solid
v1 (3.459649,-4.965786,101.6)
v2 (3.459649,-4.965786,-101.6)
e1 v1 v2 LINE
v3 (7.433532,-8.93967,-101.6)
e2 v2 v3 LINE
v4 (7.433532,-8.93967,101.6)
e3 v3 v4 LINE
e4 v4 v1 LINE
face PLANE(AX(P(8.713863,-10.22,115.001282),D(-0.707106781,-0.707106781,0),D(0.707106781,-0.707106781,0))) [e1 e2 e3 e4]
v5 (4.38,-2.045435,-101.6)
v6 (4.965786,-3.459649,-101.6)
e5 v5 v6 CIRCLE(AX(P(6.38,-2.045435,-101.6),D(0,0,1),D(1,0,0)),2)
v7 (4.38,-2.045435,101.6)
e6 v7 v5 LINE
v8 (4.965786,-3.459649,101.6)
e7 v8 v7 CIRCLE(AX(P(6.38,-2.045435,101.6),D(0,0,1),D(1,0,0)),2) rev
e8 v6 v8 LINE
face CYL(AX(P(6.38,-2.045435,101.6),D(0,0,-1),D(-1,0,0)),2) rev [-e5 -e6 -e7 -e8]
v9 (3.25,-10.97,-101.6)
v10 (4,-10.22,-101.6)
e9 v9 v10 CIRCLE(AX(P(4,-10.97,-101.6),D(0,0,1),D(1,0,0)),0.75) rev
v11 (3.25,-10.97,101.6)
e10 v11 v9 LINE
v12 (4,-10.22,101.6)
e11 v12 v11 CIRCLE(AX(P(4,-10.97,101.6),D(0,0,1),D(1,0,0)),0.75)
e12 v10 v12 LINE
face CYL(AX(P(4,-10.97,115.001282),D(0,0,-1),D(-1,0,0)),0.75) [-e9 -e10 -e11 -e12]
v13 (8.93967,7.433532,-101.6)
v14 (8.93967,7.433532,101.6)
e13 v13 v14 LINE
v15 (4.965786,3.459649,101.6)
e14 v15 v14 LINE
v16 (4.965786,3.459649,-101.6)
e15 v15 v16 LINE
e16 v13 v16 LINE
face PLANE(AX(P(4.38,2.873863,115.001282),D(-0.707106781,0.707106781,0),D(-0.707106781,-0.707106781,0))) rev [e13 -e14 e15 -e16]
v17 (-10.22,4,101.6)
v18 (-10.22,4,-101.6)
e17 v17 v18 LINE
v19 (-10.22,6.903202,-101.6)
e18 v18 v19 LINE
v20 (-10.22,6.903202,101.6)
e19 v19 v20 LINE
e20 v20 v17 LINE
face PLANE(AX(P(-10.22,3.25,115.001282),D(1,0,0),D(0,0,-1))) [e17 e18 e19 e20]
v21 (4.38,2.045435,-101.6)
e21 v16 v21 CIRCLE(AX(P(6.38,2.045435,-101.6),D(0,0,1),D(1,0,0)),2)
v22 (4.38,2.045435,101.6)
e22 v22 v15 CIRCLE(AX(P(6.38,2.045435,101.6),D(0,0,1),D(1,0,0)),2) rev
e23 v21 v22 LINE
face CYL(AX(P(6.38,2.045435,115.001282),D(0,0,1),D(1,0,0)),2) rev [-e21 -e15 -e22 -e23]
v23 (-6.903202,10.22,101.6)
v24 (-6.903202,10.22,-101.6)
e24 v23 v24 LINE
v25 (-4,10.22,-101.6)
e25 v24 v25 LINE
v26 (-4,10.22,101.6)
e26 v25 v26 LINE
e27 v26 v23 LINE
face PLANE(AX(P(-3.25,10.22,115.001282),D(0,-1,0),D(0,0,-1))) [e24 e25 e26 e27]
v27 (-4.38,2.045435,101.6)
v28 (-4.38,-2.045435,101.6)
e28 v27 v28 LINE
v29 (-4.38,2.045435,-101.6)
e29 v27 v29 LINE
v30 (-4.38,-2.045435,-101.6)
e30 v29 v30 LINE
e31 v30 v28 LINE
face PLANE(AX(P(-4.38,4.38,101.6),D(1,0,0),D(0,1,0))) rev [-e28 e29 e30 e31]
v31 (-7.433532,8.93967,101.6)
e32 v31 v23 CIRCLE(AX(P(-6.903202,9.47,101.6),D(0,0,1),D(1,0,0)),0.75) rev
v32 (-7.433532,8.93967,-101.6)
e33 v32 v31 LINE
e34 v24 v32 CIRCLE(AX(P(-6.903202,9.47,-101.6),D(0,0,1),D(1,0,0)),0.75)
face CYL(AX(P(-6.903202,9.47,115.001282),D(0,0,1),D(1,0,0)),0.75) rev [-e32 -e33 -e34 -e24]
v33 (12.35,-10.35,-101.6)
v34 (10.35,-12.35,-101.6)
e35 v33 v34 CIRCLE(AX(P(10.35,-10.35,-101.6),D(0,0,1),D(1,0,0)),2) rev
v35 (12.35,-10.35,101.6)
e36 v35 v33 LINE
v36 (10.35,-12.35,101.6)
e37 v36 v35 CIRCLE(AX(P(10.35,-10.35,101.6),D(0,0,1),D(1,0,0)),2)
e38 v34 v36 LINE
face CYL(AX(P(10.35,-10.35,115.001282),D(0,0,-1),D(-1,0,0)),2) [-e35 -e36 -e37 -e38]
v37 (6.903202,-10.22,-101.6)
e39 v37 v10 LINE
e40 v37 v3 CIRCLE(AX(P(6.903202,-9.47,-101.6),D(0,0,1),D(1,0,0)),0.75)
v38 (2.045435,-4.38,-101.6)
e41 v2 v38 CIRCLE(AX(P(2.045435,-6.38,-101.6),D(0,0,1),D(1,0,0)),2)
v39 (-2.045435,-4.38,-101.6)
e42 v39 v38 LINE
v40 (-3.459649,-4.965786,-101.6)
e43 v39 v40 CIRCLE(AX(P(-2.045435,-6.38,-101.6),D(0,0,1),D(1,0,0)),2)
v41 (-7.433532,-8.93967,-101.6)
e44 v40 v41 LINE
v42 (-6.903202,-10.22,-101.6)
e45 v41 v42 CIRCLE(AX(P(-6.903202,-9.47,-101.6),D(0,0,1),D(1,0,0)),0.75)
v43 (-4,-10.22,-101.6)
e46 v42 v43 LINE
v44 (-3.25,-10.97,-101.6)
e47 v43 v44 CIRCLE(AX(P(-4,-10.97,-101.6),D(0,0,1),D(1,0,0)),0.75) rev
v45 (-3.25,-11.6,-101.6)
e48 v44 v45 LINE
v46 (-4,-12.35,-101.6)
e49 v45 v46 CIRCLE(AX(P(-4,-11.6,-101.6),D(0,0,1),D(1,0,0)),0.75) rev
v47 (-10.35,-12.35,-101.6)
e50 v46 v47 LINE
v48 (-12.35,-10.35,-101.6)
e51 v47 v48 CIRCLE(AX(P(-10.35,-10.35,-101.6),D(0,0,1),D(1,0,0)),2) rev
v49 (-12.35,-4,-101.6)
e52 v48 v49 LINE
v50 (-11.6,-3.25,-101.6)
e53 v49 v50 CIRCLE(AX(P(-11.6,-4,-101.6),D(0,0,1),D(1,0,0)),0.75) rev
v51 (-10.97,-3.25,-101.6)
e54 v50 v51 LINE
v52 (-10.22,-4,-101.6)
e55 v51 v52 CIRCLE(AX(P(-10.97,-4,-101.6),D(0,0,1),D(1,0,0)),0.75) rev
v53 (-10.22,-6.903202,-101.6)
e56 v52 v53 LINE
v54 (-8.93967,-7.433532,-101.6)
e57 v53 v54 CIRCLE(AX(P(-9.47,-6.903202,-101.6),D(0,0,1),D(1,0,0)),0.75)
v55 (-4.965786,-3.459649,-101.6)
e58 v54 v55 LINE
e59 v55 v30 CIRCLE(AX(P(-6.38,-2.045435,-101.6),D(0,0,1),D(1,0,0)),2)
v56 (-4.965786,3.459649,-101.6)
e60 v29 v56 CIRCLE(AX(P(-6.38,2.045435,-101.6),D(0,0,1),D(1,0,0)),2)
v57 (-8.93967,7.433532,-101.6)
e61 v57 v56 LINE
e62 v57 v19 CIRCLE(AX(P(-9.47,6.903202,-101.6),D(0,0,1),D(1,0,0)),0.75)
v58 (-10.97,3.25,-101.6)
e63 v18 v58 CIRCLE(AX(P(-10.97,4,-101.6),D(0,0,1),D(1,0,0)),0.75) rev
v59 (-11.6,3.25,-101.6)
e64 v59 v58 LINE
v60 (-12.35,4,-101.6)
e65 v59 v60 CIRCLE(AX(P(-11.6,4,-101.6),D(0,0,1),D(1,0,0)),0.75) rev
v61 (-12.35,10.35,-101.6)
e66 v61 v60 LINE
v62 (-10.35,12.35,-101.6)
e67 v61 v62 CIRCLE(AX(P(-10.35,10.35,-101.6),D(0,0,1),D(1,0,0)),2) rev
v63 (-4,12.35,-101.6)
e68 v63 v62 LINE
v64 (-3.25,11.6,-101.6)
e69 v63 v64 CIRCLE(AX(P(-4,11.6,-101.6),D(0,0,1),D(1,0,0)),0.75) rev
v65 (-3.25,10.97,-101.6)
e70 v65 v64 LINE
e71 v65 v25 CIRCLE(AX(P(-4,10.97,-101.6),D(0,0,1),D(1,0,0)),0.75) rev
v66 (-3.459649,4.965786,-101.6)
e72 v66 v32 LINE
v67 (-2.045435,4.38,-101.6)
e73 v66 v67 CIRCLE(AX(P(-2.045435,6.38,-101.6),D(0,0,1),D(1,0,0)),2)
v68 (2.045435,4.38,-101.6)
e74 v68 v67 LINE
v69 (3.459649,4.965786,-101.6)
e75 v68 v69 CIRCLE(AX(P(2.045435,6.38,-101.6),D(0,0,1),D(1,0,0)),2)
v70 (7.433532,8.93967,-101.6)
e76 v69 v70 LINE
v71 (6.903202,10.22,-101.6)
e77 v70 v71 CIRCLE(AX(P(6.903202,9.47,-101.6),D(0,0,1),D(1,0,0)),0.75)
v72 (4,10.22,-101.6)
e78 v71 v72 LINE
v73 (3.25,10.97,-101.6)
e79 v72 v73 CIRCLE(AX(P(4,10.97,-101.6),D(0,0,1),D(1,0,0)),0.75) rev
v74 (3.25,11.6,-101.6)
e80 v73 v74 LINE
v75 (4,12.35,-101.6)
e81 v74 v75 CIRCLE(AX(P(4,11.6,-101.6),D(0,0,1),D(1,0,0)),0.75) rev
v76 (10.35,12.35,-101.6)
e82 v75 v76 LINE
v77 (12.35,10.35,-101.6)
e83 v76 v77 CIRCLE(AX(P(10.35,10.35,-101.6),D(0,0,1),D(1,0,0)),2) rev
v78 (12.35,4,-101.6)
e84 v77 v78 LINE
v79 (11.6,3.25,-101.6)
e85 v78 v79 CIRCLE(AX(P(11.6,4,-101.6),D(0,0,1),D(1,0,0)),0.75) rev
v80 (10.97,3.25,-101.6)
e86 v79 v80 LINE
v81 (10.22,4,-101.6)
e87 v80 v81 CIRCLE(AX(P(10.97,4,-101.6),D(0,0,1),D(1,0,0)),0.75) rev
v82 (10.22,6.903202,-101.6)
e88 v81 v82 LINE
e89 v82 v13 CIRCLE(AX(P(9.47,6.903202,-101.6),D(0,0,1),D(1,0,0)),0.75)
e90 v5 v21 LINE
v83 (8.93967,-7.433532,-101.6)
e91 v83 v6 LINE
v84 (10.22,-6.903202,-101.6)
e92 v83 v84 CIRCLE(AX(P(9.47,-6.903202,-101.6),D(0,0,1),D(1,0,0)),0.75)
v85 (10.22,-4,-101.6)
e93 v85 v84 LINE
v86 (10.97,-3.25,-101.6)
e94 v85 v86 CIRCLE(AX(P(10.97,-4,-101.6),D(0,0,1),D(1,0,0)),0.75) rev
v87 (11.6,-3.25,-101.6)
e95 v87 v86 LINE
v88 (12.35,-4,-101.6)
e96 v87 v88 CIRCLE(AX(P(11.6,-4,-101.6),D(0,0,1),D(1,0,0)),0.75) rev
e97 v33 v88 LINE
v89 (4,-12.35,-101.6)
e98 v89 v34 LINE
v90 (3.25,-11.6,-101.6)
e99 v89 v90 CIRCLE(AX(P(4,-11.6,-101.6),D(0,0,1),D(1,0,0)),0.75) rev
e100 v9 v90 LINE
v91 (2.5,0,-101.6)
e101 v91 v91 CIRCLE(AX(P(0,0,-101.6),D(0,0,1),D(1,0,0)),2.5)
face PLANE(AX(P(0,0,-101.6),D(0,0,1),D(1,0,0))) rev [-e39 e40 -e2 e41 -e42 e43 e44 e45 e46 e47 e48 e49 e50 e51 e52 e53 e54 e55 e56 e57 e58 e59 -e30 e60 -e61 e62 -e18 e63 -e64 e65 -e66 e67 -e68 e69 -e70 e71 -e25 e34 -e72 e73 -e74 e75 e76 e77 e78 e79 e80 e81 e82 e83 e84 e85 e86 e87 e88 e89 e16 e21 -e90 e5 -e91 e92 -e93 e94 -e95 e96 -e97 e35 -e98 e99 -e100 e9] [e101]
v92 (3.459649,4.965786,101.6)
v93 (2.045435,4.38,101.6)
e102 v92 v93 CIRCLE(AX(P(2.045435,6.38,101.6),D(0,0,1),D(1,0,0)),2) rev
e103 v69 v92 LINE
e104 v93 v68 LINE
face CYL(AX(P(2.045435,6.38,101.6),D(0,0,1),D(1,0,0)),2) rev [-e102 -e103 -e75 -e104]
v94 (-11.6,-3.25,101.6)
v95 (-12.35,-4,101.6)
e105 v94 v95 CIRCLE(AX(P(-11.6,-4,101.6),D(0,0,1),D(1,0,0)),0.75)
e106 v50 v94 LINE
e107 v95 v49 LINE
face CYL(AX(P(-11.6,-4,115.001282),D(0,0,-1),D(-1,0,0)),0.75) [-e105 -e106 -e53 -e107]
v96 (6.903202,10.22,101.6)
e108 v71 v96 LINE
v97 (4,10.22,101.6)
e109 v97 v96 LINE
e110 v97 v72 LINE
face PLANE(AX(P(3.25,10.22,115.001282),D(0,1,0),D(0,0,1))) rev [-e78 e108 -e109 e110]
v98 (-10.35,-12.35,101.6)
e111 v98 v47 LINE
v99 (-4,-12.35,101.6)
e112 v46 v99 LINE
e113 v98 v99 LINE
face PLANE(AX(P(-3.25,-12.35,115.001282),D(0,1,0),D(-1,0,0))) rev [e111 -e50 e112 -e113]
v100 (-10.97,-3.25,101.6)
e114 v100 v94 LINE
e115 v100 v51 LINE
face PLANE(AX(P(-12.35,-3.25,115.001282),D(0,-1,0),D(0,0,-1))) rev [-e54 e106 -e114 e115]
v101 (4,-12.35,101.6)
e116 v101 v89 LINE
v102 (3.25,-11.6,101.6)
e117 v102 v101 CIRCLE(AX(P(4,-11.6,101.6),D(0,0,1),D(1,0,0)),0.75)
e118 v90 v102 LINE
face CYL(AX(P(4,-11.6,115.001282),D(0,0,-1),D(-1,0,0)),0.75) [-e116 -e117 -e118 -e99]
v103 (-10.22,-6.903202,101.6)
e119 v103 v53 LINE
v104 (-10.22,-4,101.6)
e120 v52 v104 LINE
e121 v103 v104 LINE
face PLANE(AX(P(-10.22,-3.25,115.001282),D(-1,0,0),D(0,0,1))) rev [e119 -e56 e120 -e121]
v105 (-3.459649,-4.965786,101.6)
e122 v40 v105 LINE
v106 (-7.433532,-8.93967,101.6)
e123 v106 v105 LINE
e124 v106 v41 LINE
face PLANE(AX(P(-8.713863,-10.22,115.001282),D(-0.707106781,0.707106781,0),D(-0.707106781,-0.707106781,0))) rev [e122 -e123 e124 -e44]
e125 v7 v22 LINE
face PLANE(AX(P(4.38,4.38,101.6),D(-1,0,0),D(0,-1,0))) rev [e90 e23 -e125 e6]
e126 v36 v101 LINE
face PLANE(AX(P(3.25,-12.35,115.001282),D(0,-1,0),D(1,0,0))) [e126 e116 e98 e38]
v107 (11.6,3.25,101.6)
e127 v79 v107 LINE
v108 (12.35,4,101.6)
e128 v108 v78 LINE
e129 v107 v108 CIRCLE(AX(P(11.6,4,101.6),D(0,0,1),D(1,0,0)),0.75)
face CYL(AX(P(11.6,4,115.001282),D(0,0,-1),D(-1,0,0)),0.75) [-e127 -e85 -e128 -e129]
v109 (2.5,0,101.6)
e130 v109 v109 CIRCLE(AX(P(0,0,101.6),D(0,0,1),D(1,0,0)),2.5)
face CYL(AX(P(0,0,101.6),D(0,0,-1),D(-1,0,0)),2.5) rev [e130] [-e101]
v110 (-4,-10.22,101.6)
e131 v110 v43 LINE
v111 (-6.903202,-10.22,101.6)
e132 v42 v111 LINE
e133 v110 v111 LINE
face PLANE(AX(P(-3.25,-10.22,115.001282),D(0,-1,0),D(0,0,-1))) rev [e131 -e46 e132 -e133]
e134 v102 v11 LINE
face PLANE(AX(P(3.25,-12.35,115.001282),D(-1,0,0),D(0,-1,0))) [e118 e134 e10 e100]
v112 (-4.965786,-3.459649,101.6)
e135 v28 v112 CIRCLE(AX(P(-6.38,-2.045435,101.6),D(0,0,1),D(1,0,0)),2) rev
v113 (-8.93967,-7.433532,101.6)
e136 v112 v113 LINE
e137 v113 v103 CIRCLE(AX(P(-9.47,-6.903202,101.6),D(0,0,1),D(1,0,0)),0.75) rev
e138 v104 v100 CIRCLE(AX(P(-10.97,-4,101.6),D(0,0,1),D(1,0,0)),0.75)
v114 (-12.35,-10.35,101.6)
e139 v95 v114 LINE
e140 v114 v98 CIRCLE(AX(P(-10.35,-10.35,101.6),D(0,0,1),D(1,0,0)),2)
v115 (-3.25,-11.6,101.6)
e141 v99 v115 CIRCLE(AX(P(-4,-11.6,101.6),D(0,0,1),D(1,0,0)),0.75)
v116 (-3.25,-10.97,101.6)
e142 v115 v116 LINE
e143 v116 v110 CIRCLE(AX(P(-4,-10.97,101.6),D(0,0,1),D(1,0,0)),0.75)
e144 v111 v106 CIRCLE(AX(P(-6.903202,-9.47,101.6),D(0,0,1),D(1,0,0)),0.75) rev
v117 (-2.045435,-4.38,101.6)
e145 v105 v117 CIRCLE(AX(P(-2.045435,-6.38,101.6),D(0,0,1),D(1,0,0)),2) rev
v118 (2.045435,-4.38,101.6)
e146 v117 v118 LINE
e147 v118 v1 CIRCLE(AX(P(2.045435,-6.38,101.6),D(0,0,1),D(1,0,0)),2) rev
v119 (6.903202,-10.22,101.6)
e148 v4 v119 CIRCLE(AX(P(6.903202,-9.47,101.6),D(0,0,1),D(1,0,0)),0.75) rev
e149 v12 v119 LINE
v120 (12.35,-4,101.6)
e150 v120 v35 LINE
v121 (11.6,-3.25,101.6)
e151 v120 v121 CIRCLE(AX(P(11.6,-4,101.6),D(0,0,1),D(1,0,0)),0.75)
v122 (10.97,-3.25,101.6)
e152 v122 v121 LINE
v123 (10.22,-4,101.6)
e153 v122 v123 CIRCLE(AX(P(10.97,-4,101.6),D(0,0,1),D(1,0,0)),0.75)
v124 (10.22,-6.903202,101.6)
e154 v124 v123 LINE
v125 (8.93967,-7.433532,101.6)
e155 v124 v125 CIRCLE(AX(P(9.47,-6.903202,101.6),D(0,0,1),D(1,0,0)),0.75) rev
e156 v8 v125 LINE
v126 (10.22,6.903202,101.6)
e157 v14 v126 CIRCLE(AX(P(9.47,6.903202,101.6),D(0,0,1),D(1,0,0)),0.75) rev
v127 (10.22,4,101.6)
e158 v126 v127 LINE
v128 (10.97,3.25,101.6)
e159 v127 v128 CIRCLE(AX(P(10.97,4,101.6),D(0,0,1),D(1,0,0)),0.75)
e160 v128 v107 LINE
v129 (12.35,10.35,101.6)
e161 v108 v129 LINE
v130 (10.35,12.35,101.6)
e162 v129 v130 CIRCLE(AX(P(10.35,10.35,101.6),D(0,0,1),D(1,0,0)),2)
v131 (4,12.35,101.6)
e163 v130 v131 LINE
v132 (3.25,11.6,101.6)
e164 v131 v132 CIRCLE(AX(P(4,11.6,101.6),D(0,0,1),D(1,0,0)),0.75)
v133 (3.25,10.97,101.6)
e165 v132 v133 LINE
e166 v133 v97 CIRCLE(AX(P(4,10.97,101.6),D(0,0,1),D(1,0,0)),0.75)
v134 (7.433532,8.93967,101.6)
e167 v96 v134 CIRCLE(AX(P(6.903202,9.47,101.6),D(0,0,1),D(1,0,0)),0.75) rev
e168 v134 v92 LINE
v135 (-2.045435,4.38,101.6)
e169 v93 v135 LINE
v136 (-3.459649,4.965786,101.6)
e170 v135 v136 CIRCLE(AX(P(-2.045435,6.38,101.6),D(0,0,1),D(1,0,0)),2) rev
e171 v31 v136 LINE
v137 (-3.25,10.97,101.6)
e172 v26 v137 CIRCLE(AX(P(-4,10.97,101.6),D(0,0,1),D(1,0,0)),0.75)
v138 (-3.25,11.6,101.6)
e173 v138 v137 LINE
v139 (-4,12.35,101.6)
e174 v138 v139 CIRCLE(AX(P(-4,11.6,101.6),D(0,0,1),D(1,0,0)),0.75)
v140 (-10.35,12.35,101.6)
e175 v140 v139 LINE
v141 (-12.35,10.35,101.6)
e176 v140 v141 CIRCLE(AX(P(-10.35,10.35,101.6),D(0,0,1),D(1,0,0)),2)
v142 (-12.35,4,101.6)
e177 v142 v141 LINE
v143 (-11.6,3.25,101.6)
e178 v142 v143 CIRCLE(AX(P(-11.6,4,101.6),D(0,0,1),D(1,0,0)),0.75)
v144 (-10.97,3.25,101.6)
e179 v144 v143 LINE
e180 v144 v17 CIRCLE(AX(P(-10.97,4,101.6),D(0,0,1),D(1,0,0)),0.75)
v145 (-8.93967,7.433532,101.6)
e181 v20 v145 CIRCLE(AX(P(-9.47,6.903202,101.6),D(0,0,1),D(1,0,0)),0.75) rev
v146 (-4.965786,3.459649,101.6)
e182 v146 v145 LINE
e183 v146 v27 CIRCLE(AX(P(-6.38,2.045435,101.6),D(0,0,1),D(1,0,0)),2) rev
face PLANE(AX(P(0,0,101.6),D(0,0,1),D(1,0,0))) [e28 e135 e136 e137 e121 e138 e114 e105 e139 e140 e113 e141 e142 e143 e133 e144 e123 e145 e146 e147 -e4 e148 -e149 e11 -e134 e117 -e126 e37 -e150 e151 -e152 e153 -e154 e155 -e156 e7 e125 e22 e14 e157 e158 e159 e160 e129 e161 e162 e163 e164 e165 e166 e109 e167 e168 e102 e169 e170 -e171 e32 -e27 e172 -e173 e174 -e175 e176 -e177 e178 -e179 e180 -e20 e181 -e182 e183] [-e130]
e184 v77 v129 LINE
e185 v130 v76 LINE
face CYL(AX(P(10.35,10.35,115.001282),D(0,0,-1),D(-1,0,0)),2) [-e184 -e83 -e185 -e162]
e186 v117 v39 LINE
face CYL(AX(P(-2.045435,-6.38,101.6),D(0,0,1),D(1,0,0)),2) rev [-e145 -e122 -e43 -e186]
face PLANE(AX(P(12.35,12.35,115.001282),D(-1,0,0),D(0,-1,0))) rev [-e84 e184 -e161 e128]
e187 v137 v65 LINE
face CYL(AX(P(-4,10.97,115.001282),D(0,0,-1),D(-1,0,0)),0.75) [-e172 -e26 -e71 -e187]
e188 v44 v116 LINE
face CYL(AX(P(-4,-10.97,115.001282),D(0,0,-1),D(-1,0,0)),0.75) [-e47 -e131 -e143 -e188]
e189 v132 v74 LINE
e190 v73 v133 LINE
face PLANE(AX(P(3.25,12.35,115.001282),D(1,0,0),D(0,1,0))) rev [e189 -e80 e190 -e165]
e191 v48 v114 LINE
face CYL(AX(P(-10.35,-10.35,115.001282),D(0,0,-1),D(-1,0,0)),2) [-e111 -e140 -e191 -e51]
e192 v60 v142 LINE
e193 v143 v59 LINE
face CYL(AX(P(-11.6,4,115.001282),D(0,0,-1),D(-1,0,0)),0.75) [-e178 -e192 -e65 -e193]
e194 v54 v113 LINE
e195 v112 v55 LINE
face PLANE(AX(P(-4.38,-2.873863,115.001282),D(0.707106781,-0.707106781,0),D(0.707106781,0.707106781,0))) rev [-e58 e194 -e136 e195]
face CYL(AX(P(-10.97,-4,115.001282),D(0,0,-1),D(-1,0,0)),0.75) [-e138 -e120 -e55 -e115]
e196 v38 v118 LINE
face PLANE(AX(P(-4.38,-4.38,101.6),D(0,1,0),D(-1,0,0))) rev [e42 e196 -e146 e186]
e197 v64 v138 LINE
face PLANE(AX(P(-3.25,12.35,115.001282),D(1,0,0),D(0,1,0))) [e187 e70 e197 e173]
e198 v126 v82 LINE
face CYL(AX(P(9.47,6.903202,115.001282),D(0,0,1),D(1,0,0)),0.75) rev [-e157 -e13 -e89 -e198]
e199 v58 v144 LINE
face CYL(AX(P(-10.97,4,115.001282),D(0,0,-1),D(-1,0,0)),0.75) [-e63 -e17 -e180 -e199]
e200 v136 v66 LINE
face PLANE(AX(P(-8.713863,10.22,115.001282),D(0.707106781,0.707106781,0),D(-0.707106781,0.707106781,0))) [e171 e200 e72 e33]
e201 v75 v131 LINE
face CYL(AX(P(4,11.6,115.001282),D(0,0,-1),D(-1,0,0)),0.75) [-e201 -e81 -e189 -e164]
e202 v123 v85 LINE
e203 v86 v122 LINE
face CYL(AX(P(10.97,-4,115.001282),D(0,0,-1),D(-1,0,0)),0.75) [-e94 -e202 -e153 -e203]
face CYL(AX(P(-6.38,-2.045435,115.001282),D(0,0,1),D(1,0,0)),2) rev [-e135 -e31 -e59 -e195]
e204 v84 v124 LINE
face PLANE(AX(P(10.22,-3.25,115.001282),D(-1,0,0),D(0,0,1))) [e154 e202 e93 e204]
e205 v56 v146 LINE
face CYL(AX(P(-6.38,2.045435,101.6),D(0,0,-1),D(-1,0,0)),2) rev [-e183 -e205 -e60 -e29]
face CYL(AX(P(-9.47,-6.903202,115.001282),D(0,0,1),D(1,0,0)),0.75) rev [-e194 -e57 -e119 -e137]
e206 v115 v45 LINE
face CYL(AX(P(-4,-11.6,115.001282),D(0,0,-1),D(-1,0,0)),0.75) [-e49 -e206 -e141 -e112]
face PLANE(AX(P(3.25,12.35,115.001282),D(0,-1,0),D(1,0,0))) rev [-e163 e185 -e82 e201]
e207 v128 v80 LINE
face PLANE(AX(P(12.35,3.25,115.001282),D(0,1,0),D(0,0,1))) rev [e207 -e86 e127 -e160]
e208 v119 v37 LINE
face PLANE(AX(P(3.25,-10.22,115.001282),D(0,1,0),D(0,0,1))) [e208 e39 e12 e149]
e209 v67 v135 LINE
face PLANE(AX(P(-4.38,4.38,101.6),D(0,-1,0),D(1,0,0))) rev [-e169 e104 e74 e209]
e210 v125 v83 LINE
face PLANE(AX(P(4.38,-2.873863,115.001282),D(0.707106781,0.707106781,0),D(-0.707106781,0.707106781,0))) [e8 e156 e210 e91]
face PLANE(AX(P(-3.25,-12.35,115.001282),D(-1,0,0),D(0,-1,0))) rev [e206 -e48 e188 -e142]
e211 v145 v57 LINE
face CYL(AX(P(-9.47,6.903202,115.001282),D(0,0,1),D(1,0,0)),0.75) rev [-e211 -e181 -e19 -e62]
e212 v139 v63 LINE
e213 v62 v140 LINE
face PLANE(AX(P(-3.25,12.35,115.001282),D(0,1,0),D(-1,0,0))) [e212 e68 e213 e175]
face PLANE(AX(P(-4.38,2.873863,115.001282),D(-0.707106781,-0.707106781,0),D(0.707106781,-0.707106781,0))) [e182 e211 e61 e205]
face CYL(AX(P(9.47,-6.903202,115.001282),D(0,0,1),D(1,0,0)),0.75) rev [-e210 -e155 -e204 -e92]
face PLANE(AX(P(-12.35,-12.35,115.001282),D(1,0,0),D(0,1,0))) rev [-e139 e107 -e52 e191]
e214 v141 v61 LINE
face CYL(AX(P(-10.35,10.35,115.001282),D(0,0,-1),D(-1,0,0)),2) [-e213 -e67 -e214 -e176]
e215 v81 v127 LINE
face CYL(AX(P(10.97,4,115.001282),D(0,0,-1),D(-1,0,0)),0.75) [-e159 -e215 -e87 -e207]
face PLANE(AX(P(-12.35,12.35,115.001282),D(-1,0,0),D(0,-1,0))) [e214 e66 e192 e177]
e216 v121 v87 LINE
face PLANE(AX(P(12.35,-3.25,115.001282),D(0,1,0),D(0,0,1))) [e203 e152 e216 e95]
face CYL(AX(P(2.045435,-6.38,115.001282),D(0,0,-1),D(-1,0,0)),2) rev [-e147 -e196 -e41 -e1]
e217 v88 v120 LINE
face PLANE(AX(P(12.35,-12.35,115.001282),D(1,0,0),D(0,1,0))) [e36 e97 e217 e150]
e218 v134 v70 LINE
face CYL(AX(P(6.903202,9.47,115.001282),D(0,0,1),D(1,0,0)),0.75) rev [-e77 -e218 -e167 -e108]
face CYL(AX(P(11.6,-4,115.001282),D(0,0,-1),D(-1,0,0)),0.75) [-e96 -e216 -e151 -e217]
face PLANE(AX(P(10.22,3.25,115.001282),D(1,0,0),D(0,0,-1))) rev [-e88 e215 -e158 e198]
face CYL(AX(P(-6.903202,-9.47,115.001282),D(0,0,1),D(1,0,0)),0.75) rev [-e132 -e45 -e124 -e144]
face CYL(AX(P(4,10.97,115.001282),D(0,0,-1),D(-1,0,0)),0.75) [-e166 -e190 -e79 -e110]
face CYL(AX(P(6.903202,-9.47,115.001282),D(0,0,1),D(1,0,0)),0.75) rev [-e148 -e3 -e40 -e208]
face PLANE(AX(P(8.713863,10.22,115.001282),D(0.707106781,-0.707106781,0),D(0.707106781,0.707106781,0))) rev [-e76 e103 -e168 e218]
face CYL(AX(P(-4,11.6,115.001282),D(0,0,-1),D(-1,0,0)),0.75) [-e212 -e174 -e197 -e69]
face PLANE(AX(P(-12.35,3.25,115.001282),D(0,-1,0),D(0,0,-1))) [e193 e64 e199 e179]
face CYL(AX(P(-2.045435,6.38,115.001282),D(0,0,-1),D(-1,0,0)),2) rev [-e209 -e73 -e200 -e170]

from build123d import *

# Parameters (mm, degrees)
SKETCH2_W            = 8.76
SKETCH2_H            = 8.76
SKETCH2_R            = 2.5
BOSS_EXTRUDE1_DEPTH  = 101.6
BOSS_EXTRUDE2_START  = -101.6
BOSS_EXTRUDE2_DEPTH  = 203.2
FILLET1_R            = 0.75
FILLET1_OF_MIRROR1_R = 0.75
MIRROR2_START        = -101.6
MIRROR2_DEPTH        = 203.2
FILLET2_R            = 2


# Read off the part's stored shape, not the designer's step: Mirror2
with BuildPart() as part:
    # Sketch2 → Boss-Extrude1 (new, symmetric)
    with BuildSketch(Plane.XY):
        Rectangle(SKETCH2_W, SKETCH2_H)
        Circle(SKETCH2_R, mode=Mode.SUBTRACT)
    extrude(amount=BOSS_EXTRUDE1_DEPTH, both=True)

    # Sketch3 → Boss-Extrude2 (add)
    with BuildSketch(Plane.XY.offset(BOSS_EXTRUDE2_START)):
        Polygon((3.25, 12.35), (12.35, 12.35), (12.35, 3.25), (10.22, 3.25), (10.22, 8.713862556), (4.38, 2.873862556), (4.38, 4.38), (2.873862556, 4.38), (8.713862556, 10.22), (3.25, 10.22), align=None)
    boss_extrude2 = extrude(amount=BOSS_EXTRUDE2_DEPTH)

    # Fillet1
    fillet1_edges = [part.edges().sort_by_distance(p)[0] for p in [
        (3.25, 12.35, 0),
        (3.25, 10.22, 0),
        (8.713862556, 10.22, 0),
        (10.22, 8.713862556, 0),
        (10.22, 3.25, 0),
        (12.35, 3.25, 0),
    ]]
    fillet(fillet1_edges, radius=FILLET1_R)

    # Mirror1: Boss-Extrude2 across plane
    add(boss_extrude2.mirror(Plane.ZX))

    # Fillet1 of Mirror1
    fillet1_of_mirror1_edges = [part.edges().sort_by_distance(p)[0] for p in [
        (3.25, -12.35, 0),
        (3.25, -10.22, 0),
        (8.713862556, -10.22, 0),
        (10.22, -8.713862556, 0),
        (10.22, -3.25, 0),
        (12.35, -3.25, 0),
    ]]
    fillet(fillet1_of_mirror1_edges, radius=FILLET1_OF_MIRROR1_R)

    # Mirror2 outline → Mirror2 (add)
    with BuildSketch(Plane.XY.offset(MIRROR2_START)):
        with BuildLine():
            ThreePointArc((-7.43353247, 8.939669914), (-7.596112034, 9.757012574), (-6.903202384, 10.22))
            Line((-6.903202384, 10.22), (-4, 10.22))
            ThreePointArc((-4, 10.22), (-3.469669914, 10.439669914), (-3.25, 10.97))
            Line((-3.25, 10.97), (-3.25, 11.6))
            ThreePointArc((-3.25, 11.6), (-3.469669914, 12.130330086), (-4, 12.35))
            Line((-4, 12.35), (-12.35, 12.35))
            Line((-12.35, 12.35), (-12.35, 4))
            ThreePointArc((-12.35, 4), (-12.130330086, 3.469669914), (-11.6, 3.25))
            Line((-11.6, 3.25), (-10.97, 3.25))
            ThreePointArc((-10.97, 3.25), (-10.439669914, 3.469669914), (-10.22, 4))
            Line((-10.22, 4), (-10.22, 6.903202384))
            ThreePointArc((-10.22, 6.903202384), (-9.757012574, 7.596112034), (-8.939669914, 7.43353247))
            Line((-8.939669914, 7.43353247), (-4.38, 2.873862556))
            Line((-4.38, 2.873862556), (-4.38, 4.38))
            Line((-4.38, 4.38), (-2.873862556, 4.38))
            Line((-2.873862556, 4.38), (-7.43353247, 8.939669914))
        make_face()
        with BuildLine():
            Line((-4.38, -4.38), (-4.38, -2.873862556))
            Line((-4.38, -2.873862556), (-8.939669914, -7.43353247))
            ThreePointArc((-8.939669914, -7.43353247), (-9.757012574, -7.596112034), (-10.22, -6.903202384))
            Line((-10.22, -6.903202384), (-10.22, -4))
            ThreePointArc((-10.22, -4), (-10.439669914, -3.469669914), (-10.97, -3.25))
            Line((-10.97, -3.25), (-11.6, -3.25))
            ThreePointArc((-11.6, -3.25), (-12.130330086, -3.469669914), (-12.35, -4))
            Line((-12.35, -4), (-12.35, -12.35))
            Line((-12.35, -12.35), (-4, -12.35))
            ThreePointArc((-4, -12.35), (-3.469669914, -12.130330086), (-3.25, -11.6))
            Line((-3.25, -11.6), (-3.25, -10.97))
            ThreePointArc((-3.25, -10.97), (-3.469669914, -10.439669914), (-4, -10.22))
            Line((-4, -10.22), (-6.903202384, -10.22))
            ThreePointArc((-6.903202384, -10.22), (-7.596112034, -9.757012574), (-7.43353247, -8.939669914))
            Line((-7.43353247, -8.939669914), (-2.873862556, -4.38))
            Line((-2.873862556, -4.38), (-4.38, -4.38))
        make_face()
    extrude(amount=MIRROR2_DEPTH)

    # Fillet2
    fillet2_edges = [part.edges().sort_by_distance(p)[0] for p in [
        (-2.873862556, -4.38, 0),
        (-4.38, -2.873862556, 0),
        (-12.35, -12.35, 0),
        (2.873862556, 4.38, 0),
        (4.38, 2.873862556, 0),
        (12.35, 12.35, 0),
        (-2.873862556, 4.38, 0),
        (-4.38, 2.873862556, 0),
        (-12.35, 12.35, 0),
        (2.873862556, -4.38, 0),
        (4.38, -2.873862556, 0),
        (12.35, -12.35, 0),
    ]]
    fillet(fillet2_edges, radius=FILLET2_R)


solid = part.part
